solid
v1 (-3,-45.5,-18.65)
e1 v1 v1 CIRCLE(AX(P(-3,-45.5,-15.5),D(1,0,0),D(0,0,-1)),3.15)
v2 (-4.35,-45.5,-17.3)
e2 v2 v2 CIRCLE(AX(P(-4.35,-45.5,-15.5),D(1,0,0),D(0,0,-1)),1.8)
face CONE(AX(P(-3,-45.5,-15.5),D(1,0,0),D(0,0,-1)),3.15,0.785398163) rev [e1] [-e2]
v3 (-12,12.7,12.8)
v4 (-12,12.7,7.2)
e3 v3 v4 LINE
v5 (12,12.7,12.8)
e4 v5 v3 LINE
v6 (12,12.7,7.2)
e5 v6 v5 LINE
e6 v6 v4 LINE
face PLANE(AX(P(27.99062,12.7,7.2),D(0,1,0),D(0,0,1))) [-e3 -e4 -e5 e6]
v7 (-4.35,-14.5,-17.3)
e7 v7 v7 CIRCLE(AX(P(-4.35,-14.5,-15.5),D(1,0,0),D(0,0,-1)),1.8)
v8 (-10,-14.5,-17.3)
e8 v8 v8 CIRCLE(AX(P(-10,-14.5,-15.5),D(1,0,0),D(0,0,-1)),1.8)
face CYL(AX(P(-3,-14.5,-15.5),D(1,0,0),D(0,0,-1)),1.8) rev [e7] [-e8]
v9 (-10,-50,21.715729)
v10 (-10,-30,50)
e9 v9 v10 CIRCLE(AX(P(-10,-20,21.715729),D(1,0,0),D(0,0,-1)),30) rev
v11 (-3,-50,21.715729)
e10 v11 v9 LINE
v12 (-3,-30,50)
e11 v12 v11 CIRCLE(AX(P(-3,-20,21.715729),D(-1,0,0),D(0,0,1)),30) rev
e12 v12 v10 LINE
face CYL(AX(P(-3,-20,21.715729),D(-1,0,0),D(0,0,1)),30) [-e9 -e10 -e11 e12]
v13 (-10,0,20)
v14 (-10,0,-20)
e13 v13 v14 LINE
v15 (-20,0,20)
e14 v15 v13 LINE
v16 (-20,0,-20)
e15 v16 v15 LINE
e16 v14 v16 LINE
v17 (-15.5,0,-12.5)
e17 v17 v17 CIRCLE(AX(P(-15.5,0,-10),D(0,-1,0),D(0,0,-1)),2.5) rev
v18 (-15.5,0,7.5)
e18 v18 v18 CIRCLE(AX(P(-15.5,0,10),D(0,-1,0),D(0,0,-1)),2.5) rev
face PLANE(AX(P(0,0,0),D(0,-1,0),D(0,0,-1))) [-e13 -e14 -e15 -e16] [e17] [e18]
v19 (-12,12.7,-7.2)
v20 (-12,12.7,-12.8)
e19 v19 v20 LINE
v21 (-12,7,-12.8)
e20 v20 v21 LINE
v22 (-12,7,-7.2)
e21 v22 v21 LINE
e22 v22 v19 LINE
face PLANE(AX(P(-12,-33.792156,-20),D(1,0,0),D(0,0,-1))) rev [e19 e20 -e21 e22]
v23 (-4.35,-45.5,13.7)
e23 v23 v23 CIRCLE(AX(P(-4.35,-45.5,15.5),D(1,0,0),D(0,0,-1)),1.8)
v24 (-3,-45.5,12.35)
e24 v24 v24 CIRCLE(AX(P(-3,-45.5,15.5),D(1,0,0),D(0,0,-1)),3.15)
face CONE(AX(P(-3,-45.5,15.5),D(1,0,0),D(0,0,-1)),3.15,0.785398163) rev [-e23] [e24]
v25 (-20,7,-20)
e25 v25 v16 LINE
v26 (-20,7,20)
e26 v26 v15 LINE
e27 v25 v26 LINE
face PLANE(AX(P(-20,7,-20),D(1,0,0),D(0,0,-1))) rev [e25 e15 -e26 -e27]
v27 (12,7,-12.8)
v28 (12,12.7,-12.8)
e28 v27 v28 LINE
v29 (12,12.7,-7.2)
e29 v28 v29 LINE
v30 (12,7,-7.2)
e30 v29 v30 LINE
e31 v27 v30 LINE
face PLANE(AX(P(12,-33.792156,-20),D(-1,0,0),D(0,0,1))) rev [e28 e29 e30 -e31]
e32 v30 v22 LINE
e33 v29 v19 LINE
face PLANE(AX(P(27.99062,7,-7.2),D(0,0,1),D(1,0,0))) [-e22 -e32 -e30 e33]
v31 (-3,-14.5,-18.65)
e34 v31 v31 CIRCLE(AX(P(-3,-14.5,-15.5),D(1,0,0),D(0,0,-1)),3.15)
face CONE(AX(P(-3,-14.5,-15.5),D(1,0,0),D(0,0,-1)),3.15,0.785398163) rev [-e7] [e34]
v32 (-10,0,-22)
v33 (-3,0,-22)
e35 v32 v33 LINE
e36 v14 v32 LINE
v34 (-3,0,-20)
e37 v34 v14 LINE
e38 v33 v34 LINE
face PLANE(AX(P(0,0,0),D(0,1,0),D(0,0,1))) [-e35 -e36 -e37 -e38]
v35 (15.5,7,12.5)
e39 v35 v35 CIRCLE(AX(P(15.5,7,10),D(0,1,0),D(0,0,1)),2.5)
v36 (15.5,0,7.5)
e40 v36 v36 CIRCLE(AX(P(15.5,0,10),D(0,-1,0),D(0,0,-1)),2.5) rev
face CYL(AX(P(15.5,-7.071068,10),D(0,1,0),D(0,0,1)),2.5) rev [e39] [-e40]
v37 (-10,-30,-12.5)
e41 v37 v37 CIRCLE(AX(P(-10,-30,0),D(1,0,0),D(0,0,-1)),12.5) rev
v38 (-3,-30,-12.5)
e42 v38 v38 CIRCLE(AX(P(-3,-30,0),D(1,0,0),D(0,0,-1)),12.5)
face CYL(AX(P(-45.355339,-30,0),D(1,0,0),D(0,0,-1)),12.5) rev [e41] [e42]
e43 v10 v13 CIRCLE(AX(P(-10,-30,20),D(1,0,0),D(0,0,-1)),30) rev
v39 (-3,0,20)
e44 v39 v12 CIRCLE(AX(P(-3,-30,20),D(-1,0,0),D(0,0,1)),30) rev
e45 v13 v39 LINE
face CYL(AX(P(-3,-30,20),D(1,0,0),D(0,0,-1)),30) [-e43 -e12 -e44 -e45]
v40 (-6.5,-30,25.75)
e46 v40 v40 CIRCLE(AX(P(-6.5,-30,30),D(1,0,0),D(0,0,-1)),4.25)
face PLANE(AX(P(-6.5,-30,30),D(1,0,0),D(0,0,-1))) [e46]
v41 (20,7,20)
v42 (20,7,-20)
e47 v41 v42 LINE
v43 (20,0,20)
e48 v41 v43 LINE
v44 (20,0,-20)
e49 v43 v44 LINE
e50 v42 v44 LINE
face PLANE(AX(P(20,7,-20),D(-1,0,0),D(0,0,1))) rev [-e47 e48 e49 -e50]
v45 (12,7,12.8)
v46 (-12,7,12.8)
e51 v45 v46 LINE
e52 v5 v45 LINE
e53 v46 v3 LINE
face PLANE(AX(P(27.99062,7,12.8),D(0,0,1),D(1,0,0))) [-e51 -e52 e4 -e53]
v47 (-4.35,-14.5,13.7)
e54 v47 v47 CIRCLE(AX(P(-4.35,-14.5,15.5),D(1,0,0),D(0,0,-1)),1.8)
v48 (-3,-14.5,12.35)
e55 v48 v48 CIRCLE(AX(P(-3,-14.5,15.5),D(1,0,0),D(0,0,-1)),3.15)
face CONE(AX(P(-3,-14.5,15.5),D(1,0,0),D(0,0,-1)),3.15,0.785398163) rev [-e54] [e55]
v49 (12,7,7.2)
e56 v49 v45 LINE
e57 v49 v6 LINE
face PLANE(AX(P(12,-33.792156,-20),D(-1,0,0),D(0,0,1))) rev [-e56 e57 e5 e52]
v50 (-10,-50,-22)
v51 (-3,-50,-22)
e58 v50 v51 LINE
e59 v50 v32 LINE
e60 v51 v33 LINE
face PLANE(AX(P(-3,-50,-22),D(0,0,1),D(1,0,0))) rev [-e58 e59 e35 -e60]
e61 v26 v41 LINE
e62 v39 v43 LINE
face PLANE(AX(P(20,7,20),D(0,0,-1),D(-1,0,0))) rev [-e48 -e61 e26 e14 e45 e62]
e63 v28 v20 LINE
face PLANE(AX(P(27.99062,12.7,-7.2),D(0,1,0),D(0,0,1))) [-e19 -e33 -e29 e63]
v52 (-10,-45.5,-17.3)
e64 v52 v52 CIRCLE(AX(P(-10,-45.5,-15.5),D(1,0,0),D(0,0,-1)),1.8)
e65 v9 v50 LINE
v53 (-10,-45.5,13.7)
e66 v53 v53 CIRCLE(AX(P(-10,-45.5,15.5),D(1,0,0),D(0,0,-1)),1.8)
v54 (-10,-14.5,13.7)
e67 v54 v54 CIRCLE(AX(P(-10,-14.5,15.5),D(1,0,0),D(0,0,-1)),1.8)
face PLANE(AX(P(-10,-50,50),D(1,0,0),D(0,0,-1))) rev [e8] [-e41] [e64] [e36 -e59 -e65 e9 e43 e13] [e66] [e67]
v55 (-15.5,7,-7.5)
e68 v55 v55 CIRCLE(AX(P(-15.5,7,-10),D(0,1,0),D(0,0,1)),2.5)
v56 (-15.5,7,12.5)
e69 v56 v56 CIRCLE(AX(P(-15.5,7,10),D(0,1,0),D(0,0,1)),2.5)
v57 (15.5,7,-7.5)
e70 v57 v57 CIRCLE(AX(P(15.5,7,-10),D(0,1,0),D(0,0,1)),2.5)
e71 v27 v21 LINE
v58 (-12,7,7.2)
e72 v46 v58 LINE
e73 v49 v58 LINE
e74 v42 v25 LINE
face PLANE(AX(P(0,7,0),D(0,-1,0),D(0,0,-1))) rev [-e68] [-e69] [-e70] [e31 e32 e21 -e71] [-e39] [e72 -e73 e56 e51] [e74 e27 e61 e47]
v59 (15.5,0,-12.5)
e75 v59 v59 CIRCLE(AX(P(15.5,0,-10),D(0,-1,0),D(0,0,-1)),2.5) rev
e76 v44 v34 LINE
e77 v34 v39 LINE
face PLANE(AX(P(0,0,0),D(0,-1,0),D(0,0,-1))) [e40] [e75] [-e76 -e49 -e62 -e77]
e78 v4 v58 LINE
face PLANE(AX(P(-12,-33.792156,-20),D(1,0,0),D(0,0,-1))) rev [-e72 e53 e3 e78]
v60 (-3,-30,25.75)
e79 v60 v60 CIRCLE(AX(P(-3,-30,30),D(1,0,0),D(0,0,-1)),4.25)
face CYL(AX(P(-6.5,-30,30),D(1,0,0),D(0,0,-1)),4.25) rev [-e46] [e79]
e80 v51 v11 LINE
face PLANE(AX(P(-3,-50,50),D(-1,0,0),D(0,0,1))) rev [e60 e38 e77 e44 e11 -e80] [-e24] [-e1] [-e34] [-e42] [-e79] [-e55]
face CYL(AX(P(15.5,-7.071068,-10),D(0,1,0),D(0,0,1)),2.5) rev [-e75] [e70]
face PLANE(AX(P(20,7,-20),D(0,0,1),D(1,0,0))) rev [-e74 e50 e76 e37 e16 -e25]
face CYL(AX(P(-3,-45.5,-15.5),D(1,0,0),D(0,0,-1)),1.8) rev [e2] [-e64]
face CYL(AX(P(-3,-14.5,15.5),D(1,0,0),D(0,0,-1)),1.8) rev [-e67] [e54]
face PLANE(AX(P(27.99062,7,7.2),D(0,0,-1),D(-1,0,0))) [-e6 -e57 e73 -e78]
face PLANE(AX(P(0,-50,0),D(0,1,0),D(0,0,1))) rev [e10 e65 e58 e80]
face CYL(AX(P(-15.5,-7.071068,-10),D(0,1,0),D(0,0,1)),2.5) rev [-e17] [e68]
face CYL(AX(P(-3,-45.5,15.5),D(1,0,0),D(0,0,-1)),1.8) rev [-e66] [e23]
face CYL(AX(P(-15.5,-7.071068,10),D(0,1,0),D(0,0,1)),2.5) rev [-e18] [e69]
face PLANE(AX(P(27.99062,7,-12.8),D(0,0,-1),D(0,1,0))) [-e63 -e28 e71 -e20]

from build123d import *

# Parameters (mm, degrees)
CROQUIS1_W                                           = 40
CROQUIS1_H                                           = 40
SALIENTE_EXTRUIR1_DEPTH                              = 7
CROQUIS3_W                                           = 5.6
CROQUIS3_H                                           = 5.7
SALIENTE_EXTRUIR3_DEPTH                              = 40
CROQUIS19_W                                          = 8
CROQUIS19_H                                          = 40
CORTAR_EXTRUIR5_DEPTH                                = 5.7
CROQUIS20_R                                          = 2.5
CORTAR_EXTRUIR6_DEPTH                                = 7
CROQUIS21_W                                          = 7
CROQUIS21_H                                          = 72
SALIENTE_EXTRUIR4_DEPTH                              = 50
CROQUIS22_R                                          = 12.5
CORTAR_EXTRUIR7_DEPTH                                = 7
AVELLANADO_PARA_TORNILLO_CON_CABEZA_PLAN_D           = 3.6
AVELLANADO_PARA_TORNILLO_CON_CABEZA_PLAN_CSINK_D     = 6.3
AVELLANADO_PARA_TORNILLO_CON_CABEZA_PLAN_CSINK_ANGLE = 90
CROQUIS25_R                                          = 4.25
CORTAR_EXTRUIR8_DEPTH                                = 3.5
REDONDEO1_R                                          = 30
REDONDEO2_R                                          = 30


# Some blends are built 0.0001 mm under size
with BuildPart() as part:
    # Croquis1 → Saliente-Extruir1 (new body)
    with BuildSketch(Plane(origin=(0, 0, 0), x_dir=(1, 0, 0), z_dir=(0, 1, 0))):
        Rectangle(CROQUIS1_W, CROQUIS1_H)
    extrude(amount=SALIENTE_EXTRUIR1_DEPTH)

    # Croquis3 → Saliente-Extruir3 (add)
    with BuildSketch(Plane.ZY.offset(20)):
        with Locations((10, 9.85)):
            Rectangle(CROQUIS3_W, CROQUIS3_H)
        with Locations((-10, 9.85)):
            Rectangle(CROQUIS3_W, CROQUIS3_H)
    extrude(amount=-SALIENTE_EXTRUIR3_DEPTH)

    # Croquis19 → Cortar-Extruir5 (cut)
    with BuildSketch(Plane(origin=(0, 12.7, 0), x_dir=(1, 0, 0), z_dir=(0, 1, 0))):
        with Locations((-16, 0)):
            Rectangle(CROQUIS19_W, CROQUIS19_H)
        with Locations((16, 0)):
            Rectangle(CROQUIS19_W, CROQUIS19_H)
    extrude(amount=-CORTAR_EXTRUIR5_DEPTH, mode=Mode.SUBTRACT)

    # Croquis20 → Cortar-Extruir6 (cut)
    with BuildSketch(Plane(origin=(0, 7, 0), x_dir=(1, 0, 0), z_dir=(0, 1, 0))):
        with Locations(Location((-15.5, 10, 0), (0, 0, 270))):
            Circle(CROQUIS20_R)
        with Locations(Location((15.5, 10, 0), (0, 0, 270))):
            Circle(CROQUIS20_R)
        with Locations(Location((15.5, -10, 0), (0, 0, 270))):
            Circle(CROQUIS20_R)
        with Locations(Location((-15.5, -10, 0), (0, 0, 270))):
            Circle(CROQUIS20_R)
    extrude(amount=-CORTAR_EXTRUIR6_DEPTH, mode=Mode.SUBTRACT)

    # Croquis21 → Saliente-Extruir4 (add)
    with BuildSketch(Plane.XZ):
        with Locations((-6.5, 14)):
            Rectangle(CROQUIS21_W, CROQUIS21_H)
    extrude(amount=SALIENTE_EXTRUIR4_DEPTH)

    # Croquis22 → Cortar-Extruir7 (cut)
    with BuildSketch(Plane(origin=(-3, 0, 0), x_dir=(0, 0, -1), z_dir=(1, 0, 0))):
        with Locations((0, -30)):
            Circle(CROQUIS22_R)
    extrude(amount=-CORTAR_EXTRUIR7_DEPTH, mode=Mode.SUBTRACT)

    # Avellanado para tornillo con cabeza plana de M31 (through all)
    with Locations(Plane(origin=(-3, -14.5, 15.5), x_dir=(0, 0, 1), z_dir=(1, 0, 0))):
        with Locations((0, 0), (-31, 0), (-31, 31), (0, 31)):
            CounterSinkHole(AVELLANADO_PARA_TORNILLO_CON_CABEZA_PLAN_D / 2, AVELLANADO_PARA_TORNILLO_CON_CABEZA_PLAN_CSINK_D / 2, counter_sink_angle=AVELLANADO_PARA_TORNILLO_CON_CABEZA_PLAN_CSINK_ANGLE)

    # Croquis25 → Cortar-Extruir8 (cut)
    with BuildSketch(Plane(origin=(-3, 0, 0), x_dir=(0, 0, -1), z_dir=(1, 0, 0))):
        with Locations((-30, -30)):
            Circle(CROQUIS25_R)
    extrude(amount=-CORTAR_EXTRUIR8_DEPTH, mode=Mode.SUBTRACT)

    # Redondeo1
    redondeo1_edges = [part.edges().sort_by_distance(p)[0] for p in [
        (-6.5, 0, 50),
    ]]
    fillet(redondeo1_edges, radius=REDONDEO1_R - 0.0001)  # a hair under: the kernel refuses the full size

    # Redondeo2
    # the kernel refuses this fillet: 30 mm, written as the material it takes off along each edge
    with BuildSketch(Plane(origin=(67.710766507, -50, 50), x_dir=(0, 1, 0), z_dir=(-1, 0, 0))) as redondeo2_piece_1:
        with BuildLine():
            CenterArc((30, 28.284306603), REDONDEO2_R, 180, 70.528981937)
            Line((0, 28.284306603), (-0.6, 28.284306603))
            Line((-0.6, 28.284306603), (-0.6, 0))
            Line((-0.6, 0), (0, -0.6))
            ThreePointArc((0, -0.6), (10.00005, -0.6), (19.800102, -0.565686132))
            Line((19.800102, -0.565686132), (20.0001, 0))
        make_face()
    extrude(amount=148.421533013, mode=Mode.SUBTRACT)


solid = part.part
